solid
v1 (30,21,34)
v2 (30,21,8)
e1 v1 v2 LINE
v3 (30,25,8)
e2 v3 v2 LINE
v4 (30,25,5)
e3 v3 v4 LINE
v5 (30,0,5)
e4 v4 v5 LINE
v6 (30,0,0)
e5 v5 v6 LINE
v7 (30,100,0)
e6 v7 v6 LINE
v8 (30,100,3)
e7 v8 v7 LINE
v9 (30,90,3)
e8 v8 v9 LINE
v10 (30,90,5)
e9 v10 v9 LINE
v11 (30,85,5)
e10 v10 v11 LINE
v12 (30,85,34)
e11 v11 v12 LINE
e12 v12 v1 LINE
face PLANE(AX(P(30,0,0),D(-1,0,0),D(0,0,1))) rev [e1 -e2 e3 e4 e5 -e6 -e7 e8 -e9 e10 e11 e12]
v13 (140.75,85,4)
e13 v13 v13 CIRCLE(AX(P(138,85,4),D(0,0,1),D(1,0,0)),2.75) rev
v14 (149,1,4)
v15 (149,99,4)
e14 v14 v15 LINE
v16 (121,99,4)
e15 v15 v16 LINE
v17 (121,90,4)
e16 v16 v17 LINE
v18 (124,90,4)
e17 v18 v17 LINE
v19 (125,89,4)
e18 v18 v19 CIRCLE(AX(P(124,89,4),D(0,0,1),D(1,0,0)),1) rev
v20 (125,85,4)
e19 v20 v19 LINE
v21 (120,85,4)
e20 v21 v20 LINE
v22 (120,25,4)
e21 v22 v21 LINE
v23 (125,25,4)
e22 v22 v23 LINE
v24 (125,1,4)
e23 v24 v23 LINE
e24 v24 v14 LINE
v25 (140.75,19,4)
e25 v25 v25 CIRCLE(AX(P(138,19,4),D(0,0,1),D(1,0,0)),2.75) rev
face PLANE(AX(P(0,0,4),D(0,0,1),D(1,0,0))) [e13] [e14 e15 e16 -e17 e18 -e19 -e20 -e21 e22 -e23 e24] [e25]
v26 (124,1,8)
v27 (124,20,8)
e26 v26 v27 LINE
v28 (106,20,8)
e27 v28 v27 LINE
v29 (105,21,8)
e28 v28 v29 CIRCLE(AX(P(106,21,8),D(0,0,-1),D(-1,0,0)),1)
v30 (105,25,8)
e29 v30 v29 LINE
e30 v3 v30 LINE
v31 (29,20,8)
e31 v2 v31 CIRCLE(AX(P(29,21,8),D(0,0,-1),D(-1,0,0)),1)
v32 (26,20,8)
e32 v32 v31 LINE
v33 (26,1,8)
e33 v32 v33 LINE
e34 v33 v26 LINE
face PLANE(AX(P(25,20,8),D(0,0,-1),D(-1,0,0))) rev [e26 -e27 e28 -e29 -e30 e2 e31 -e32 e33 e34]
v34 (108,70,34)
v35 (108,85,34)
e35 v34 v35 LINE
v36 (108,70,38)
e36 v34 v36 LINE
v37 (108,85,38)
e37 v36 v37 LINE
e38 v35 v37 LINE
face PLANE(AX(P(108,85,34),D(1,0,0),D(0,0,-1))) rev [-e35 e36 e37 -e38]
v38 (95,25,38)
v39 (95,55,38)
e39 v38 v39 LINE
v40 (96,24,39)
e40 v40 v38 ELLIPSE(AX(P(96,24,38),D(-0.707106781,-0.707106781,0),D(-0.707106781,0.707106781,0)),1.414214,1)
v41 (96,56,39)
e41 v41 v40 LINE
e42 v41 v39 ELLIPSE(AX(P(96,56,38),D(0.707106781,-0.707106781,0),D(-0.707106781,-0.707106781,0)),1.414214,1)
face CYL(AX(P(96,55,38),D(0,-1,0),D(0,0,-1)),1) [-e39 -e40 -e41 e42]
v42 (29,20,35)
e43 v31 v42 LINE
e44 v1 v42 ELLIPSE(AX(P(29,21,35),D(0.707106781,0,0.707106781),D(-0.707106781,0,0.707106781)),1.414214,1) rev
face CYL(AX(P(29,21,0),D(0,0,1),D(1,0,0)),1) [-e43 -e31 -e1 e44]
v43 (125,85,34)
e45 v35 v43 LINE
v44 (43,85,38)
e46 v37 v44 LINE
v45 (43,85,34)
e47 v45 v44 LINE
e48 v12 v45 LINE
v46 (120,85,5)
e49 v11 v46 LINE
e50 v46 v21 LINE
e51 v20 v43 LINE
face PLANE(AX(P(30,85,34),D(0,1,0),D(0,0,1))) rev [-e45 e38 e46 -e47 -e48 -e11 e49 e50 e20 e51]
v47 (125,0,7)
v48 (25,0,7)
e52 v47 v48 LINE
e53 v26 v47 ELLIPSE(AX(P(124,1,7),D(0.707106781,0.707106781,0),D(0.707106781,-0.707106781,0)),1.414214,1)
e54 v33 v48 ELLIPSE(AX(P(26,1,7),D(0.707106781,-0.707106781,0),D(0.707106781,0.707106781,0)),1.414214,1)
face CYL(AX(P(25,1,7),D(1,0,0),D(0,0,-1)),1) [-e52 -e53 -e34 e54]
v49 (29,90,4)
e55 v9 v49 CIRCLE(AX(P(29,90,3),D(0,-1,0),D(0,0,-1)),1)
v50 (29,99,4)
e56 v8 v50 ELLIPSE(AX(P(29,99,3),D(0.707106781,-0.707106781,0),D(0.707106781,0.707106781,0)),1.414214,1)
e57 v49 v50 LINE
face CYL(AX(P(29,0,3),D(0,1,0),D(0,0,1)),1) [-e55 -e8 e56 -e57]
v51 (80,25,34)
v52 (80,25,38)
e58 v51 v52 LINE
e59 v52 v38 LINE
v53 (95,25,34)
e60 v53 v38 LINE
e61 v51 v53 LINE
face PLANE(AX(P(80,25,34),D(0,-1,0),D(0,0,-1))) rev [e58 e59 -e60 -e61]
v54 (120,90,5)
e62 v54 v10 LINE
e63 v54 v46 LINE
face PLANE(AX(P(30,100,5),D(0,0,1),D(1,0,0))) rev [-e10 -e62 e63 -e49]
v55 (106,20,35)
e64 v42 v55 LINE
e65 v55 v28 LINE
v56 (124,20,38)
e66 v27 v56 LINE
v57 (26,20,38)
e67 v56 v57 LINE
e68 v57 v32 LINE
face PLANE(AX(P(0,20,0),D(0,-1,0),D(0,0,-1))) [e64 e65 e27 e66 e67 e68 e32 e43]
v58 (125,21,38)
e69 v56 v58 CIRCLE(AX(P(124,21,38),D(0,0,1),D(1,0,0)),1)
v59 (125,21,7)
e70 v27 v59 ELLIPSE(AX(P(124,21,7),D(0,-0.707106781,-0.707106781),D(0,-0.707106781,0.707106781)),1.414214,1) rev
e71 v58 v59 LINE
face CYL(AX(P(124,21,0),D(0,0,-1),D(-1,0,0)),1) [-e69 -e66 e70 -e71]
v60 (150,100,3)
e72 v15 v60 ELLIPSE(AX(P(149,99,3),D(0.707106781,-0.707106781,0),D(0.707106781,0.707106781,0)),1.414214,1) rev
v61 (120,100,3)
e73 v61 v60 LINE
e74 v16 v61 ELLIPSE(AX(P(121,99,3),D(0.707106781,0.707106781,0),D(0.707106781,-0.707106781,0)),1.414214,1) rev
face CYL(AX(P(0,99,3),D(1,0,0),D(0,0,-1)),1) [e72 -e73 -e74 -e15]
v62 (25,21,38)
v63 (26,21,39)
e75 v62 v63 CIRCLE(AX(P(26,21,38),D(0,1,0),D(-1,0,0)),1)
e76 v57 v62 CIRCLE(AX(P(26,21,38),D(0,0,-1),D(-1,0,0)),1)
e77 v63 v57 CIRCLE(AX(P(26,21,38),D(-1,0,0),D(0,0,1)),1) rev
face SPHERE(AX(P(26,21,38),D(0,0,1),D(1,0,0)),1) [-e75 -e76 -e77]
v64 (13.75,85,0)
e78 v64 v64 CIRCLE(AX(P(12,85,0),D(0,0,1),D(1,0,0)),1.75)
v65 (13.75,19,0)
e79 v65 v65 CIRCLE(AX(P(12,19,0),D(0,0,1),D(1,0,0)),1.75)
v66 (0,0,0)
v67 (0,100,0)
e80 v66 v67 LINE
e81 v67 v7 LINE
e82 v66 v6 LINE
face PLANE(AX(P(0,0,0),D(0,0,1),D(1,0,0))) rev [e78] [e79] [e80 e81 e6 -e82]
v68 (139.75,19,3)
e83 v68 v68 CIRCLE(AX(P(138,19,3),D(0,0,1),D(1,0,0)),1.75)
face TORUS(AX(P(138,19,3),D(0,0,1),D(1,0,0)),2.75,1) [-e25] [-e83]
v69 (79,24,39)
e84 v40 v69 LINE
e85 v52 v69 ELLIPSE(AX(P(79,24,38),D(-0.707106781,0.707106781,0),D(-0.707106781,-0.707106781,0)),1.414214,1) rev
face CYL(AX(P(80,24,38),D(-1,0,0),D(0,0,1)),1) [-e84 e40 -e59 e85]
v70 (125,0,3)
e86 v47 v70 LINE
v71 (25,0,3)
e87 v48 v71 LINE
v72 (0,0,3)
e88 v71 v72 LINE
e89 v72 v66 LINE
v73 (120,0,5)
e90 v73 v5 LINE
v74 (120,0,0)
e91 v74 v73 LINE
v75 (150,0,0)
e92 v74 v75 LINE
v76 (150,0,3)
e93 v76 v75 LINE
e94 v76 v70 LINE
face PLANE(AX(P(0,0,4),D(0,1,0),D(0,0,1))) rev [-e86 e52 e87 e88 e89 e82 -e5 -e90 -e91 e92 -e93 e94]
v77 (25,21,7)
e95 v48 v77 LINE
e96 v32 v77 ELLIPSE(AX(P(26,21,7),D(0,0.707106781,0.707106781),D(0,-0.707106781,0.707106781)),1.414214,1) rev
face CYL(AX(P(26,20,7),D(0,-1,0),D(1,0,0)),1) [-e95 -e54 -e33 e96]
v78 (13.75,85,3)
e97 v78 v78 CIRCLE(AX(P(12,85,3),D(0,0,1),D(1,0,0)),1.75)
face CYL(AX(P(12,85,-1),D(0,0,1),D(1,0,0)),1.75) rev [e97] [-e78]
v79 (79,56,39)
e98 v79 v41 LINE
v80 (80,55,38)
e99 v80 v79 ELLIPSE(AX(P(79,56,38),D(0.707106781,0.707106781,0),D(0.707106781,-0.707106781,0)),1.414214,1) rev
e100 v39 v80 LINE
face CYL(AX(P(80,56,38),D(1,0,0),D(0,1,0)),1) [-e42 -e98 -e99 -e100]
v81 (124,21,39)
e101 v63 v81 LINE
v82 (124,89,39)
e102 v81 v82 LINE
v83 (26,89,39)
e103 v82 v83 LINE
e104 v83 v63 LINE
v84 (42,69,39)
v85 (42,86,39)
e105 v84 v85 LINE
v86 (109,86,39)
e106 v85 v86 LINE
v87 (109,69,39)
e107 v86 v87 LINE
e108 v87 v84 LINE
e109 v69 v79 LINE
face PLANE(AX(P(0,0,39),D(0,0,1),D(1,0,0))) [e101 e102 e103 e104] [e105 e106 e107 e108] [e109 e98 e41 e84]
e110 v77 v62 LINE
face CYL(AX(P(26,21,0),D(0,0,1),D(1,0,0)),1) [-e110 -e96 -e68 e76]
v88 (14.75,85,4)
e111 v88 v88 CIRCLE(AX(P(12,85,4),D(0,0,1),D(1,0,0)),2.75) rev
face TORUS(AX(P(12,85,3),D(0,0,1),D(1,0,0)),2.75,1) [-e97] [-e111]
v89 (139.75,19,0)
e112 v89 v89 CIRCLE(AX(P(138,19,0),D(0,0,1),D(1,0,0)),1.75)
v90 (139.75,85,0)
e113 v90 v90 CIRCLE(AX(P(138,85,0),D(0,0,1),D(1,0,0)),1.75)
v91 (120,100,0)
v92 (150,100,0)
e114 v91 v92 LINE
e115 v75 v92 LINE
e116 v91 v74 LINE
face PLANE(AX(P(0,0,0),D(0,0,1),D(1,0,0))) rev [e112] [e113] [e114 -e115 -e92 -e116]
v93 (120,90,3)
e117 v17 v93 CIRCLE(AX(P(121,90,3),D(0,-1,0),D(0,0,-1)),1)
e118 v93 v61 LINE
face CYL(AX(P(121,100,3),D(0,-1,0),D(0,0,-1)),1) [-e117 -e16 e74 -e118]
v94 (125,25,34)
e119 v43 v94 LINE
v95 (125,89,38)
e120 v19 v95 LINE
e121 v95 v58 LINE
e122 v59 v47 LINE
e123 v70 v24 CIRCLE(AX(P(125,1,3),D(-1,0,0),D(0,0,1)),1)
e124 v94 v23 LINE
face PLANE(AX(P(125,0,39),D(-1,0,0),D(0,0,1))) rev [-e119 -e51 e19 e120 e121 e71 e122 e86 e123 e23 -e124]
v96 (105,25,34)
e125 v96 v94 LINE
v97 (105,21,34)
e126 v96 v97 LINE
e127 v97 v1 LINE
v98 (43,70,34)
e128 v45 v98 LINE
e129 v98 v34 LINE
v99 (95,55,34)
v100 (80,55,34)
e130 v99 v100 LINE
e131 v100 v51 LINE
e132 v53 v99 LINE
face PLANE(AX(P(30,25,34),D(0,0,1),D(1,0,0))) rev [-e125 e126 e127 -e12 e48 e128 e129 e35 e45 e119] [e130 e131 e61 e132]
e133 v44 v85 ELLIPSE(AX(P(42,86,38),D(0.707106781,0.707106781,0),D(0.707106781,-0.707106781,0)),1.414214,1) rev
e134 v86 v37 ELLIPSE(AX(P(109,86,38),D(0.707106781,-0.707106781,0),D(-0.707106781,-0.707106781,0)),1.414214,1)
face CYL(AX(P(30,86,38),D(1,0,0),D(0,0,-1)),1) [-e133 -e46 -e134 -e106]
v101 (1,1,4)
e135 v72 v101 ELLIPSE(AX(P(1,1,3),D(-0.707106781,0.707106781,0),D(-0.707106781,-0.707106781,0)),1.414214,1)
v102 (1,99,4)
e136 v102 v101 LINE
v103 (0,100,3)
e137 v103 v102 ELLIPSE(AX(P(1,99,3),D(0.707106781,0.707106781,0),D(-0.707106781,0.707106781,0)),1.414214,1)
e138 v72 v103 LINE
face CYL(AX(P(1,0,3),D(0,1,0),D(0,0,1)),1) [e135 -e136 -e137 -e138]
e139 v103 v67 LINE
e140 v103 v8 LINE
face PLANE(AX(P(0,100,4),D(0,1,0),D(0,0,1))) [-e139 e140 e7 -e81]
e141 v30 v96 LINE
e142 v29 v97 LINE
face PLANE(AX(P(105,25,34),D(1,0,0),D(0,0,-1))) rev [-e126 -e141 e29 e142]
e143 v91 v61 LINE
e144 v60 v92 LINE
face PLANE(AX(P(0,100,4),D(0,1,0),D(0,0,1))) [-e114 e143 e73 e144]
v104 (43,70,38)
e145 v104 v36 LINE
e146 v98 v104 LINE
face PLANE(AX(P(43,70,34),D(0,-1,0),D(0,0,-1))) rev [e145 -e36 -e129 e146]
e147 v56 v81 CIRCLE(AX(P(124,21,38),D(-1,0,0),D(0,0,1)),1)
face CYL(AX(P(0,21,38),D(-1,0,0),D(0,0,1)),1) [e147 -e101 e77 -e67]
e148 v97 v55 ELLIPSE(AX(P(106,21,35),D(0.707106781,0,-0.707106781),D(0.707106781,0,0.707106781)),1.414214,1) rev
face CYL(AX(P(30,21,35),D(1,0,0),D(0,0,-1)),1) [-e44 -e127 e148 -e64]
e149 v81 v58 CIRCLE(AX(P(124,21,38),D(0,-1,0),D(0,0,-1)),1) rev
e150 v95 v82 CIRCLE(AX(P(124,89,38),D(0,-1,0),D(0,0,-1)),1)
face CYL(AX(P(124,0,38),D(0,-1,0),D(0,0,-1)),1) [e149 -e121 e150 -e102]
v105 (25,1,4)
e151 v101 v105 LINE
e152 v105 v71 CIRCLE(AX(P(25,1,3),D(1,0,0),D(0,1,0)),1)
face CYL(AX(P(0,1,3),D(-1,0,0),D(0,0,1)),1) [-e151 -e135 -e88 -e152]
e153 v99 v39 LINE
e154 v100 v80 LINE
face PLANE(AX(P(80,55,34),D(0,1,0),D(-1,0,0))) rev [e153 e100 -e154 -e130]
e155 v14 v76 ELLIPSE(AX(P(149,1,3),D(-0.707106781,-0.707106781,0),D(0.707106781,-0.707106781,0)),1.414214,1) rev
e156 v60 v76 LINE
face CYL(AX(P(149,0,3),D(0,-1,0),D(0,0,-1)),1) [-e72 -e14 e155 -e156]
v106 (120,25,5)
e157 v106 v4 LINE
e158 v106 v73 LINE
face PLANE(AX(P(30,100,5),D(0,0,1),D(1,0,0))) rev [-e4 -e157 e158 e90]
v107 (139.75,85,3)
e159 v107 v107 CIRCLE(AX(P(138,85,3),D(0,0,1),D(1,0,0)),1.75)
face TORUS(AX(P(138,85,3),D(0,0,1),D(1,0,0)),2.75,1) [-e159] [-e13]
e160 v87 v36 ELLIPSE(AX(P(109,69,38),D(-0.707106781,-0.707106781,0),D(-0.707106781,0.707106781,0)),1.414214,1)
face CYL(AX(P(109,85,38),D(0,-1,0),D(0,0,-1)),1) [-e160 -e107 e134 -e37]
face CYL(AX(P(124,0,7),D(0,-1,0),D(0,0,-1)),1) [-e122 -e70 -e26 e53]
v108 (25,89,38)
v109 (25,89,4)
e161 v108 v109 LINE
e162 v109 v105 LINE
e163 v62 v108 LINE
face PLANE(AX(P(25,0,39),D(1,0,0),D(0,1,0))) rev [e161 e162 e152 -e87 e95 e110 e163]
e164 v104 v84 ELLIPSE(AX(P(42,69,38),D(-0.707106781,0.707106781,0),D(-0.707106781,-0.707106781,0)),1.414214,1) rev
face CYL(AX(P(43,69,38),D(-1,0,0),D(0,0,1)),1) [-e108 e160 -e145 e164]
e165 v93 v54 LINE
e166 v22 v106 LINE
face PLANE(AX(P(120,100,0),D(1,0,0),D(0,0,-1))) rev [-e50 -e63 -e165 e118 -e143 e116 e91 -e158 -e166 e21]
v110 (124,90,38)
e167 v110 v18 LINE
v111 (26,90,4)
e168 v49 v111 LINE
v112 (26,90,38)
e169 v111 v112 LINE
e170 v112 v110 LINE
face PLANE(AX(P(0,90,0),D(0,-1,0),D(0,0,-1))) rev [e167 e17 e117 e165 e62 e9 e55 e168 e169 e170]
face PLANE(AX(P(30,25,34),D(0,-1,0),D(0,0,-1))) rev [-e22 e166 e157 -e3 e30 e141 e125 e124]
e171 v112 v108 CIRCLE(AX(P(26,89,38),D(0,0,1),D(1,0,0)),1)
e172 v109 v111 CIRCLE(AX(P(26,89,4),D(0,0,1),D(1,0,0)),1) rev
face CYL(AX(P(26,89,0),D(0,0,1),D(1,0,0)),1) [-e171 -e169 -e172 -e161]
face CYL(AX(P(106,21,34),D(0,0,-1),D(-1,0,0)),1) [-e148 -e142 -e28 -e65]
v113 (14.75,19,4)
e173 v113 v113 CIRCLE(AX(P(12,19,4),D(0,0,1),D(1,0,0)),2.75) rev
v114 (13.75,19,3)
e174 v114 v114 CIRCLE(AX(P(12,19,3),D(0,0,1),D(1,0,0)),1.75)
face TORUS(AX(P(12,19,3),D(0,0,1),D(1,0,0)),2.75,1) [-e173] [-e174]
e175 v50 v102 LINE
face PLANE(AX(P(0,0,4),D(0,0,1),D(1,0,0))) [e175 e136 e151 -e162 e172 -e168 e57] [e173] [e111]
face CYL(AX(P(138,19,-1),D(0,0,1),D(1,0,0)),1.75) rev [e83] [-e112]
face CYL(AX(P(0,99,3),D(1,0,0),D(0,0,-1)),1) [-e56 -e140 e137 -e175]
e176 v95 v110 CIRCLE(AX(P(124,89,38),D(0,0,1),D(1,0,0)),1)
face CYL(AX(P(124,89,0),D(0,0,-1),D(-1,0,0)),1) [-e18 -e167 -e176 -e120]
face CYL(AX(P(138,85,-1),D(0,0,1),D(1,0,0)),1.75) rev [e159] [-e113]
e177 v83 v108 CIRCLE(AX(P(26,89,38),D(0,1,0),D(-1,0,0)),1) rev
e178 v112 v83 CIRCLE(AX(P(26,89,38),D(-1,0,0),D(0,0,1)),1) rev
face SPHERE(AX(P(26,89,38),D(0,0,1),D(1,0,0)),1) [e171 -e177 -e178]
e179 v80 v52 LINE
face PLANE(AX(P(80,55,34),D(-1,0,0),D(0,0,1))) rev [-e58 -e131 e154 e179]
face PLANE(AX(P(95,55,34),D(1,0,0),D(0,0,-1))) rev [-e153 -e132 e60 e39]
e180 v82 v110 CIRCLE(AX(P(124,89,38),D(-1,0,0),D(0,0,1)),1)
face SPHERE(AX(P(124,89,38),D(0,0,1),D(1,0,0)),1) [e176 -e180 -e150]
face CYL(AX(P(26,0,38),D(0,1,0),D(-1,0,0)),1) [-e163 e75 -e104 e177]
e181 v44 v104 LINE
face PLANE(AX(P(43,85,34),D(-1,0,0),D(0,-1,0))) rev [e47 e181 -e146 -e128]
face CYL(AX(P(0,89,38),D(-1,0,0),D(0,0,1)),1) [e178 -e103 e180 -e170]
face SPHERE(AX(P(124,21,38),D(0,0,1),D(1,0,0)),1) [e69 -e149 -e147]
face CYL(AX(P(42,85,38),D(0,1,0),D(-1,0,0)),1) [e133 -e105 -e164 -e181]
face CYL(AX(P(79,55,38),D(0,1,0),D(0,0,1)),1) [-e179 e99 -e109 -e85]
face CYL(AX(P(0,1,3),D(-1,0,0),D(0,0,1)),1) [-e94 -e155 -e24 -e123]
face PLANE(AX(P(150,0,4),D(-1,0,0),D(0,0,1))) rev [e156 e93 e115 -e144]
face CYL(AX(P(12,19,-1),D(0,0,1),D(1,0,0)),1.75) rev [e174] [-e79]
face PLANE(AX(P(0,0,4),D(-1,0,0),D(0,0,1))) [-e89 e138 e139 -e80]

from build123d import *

# Parameters (mm, degrees)
SKETCH1_W           = 150
SKETCH1_H           = 100
BOSS_EXTRUDE1_DEPTH = 4
SKETCH2_W           = 100
SKETCH2_H           = 100
BOSS_EXTRUDE2_DEPTH = 35
SKETCH3_W           = 100
SKETCH3_H           = 31
CUT_EXTRUDE1_DEPTH  = 20
SKETCH4_W           = 100
SKETCH4_H           = 35
CUT_EXTRUDE2_DEPTH  = 10
SKETCH5_W           = 30
SKETCH5_H           = 60
CUT_EXTRUDE3_DEPTH  = 95
SKETCH6_W           = 90
SKETCH6_H           = 5
CUT_EXTRUDE4_DEPTH  = 185.447824601
SKETCH7_W           = 75
SKETCH7_H           = 26
CUT_EXTRUDE5_DEPTH  = 5
SKETCH8_W           = 65
SKETCH8_H           = 15
CUT_EXTRUDE6_DEPTH  = 5
SKETCH9_W           = 15
SKETCH9_H           = 30
CUT_EXTRUDE7_DEPTH  = 5
SKETCH10_R          = 1.75
CUT_EXTRUDE8_DEPTH  = 5
FILLET1_R           = 1
FILLET2_R           = 1
FILLET3_R           = 1
FILLET4_R           = 1
FILLET5_R           = 1


with BuildPart() as part:
    # Sketch1 → Boss-Extrude1 (new body)
    with BuildSketch(Plane.XY):
        with Locations((75, 50)):
            Rectangle(SKETCH1_W, SKETCH1_H)
    extrude(amount=BOSS_EXTRUDE1_DEPTH)

    # Sketch2 → Boss-Extrude2 (add)
    with BuildSketch(Plane.XY.offset(4)):
        with Locations((75, 50)):
            Rectangle(SKETCH2_W, SKETCH2_H)
    extrude(amount=BOSS_EXTRUDE2_DEPTH)

    # Sketch3 → Cut-Extrude1 (cut)
    with BuildSketch(Plane(origin=(0, 0, 0), x_dir=(-1, 0, 0), z_dir=(0, -1, 0))):
        with Locations((-75, -23.5)):
            Rectangle(SKETCH3_W, SKETCH3_H)
    extrude(amount=-CUT_EXTRUDE1_DEPTH, mode=Mode.SUBTRACT)

    # Sketch4 → Cut-Extrude2 (cut)
    with BuildSketch(Plane(origin=(0, 100, 0), x_dir=(1, 0, 0), z_dir=(0, 1, 0))):
        with Locations((75, -21.5)):
            Rectangle(SKETCH4_W, SKETCH4_H)
    extrude(amount=-CUT_EXTRUDE2_DEPTH, mode=Mode.SUBTRACT)

    # Sketch5 → Cut-Extrude3 (cut)
    with BuildSketch(Plane(origin=(125, 0, 0), x_dir=(0, 0, -1), z_dir=(1, 0, 0))):
        with Locations((-19, 55)):
            Rectangle(SKETCH5_W, SKETCH5_H)
    extrude(amount=-CUT_EXTRUDE3_DEPTH, mode=Mode.SUBTRACT)

    # Sketch6 → Cut-Extrude4 (cut, through all)
    with BuildSketch(Plane(origin=(0, 0, 0), x_dir=(-1, 0, 0), z_dir=(0, -1, 0))):
        with Locations((-75, -2.5)):
            Rectangle(SKETCH6_W, SKETCH6_H)
    extrude(amount=-CUT_EXTRUDE4_DEPTH, mode=Mode.SUBTRACT)

    # Sketch7 → Cut-Extrude5 (cut)
    with BuildSketch(Plane(origin=(0, 20, 0), x_dir=(-1, 0, 0), z_dir=(0, -1, 0))):
        with Locations((-67.5, -21)):
            Rectangle(SKETCH7_W, SKETCH7_H)
    extrude(amount=-CUT_EXTRUDE5_DEPTH, mode=Mode.SUBTRACT)

    # Sketch8 → Cut-Extrude6 (cut)
    with BuildSketch(Plane.XY.offset(39)):
        with Locations((75.5, 77.5)):
            Rectangle(SKETCH8_W, SKETCH8_H)
    extrude(amount=-CUT_EXTRUDE6_DEPTH, mode=Mode.SUBTRACT)

    # Sketch9 → Cut-Extrude7 (cut)
    with BuildSketch(Plane.XY.offset(39)):
        with Locations((87.5, 40)):
            Rectangle(SKETCH9_W, SKETCH9_H)
    extrude(amount=-CUT_EXTRUDE7_DEPTH, mode=Mode.SUBTRACT)

    # Sketch10 → Cut-Extrude8 (cut)
    with BuildSketch(Plane.XY.offset(4)):
        with Locations((12, 85)):
            Circle(SKETCH10_R)
        with Locations((12, 19)):
            Circle(SKETCH10_R)
        with Locations((138, 85)):
            Circle(SKETCH10_R)
        with Locations((138, 19)):
            Circle(SKETCH10_R)
    extrude(amount=-CUT_EXTRUDE8_DEPTH, mode=Mode.SUBTRACT)

    # Fillet1
    fillet1_edges = [part.edges().sort_by_distance(p)[0] for p in [
        (10.25, 19, 4),
        (136.25, 85, 4),
        (136.25, 19, 4),
        (10.25, 85, 4),
    ]]
    fillet(fillet1_edges, radius=FILLET1_R)

    # Fillet2
    fillet2_edges = [part.edges().sort_by_distance(p)[0] for p in [
        (43, 77.5, 39),
        (75.5, 70, 39),
        (108, 77.5, 39),
        (75.5, 85, 39),
        (80, 40, 39),
        (87.5, 25, 39),
        (95, 40, 39),
        (87.5, 55, 39),
        (125, 55, 39),
        (75, 20, 39),
        (25, 55, 39),
        (75, 90, 39),
    ]]
    fillet(fillet2_edges, radius=FILLET2_R)

    # Fillet3
    # the kernel refuses this fillet: 1 mm, written as the material it takes off along each edge
    with BuildSketch(Plane(origin=(26, 21, 38), x_dir=(0, -1, 0), z_dir=(-1, 0, 0))) as fillet3_piece_1_section:
        Polygon((0, 0), (FILLET3_R, 0), (FILLET3_R, FILLET3_R), (0, FILLET3_R), align=None)
    fillet3_piece_1 = extrude(amount=FILLET3_R, mode=Mode.PRIVATE)
    fillet3_piece_1 = fillet3_piece_1 - Plane(origin=(26, 21, 38), x_dir=(0, 0.7071067811865475, -0.7071067811865475), z_dir=(-1, 0, 0)) * Sphere(FILLET3_R, mode=Mode.PRIVATE)
    add(fillet3_piece_1, mode=Mode.SUBTRACT)
    with BuildSketch(Plane(origin=(26, 89, 38), x_dir=(-1, 0, 0), z_dir=(0, 1, 0))) as fillet3_piece_2_section:
        Polygon((0, 0), (FILLET3_R, 0), (FILLET3_R, FILLET3_R), (0, FILLET3_R), align=None)
    fillet3_piece_2 = extrude(amount=FILLET3_R, mode=Mode.PRIVATE)
    fillet3_piece_2 = fillet3_piece_2 - Plane(origin=(26, 89, 38), x_dir=(0.7071067811865475, 0, -0.7071067811865475), z_dir=(0, 1, 0)) * Sphere(FILLET3_R, mode=Mode.PRIVATE)
    add(fillet3_piece_2, mode=Mode.SUBTRACT)
    with BuildSketch(Plane(origin=(124, 21, 38), x_dir=(0, -1, 0), z_dir=(1, 0, 0))) as fillet3_piece_3_section:
        Polygon((0, 0), (FILLET3_R, 0), (FILLET3_R, -FILLET3_R), (0, -FILLET3_R), align=None)
    fillet3_piece_3 = extrude(amount=FILLET3_R, mode=Mode.PRIVATE)
    fillet3_piece_3 = fillet3_piece_3 - Plane(origin=(124, 21, 38), x_dir=(0, 0.7071067811865475, -0.7071067811865475), z_dir=(1, 0, 0)) * Sphere(FILLET3_R, mode=Mode.PRIVATE)
    add(fillet3_piece_3, mode=Mode.SUBTRACT)
    with BuildSketch(Plane(origin=(124, 89, 38), x_dir=(1, 0, 0), z_dir=(0, 1, 0))) as fillet3_piece_4_section:
        Polygon((0, 0), (FILLET3_R, 0), (FILLET3_R, -FILLET3_R), (0, -FILLET3_R), align=None)
    fillet3_piece_4 = extrude(amount=FILLET3_R, mode=Mode.PRIVATE)
    fillet3_piece_4 = fillet3_piece_4 - Plane(origin=(124, 89, 38), x_dir=(-0.7071067811865475, 0, -0.7071067811865475), z_dir=(0, 1, 0)) * Sphere(FILLET3_R, mode=Mode.PRIVATE)
    add(fillet3_piece_4, mode=Mode.SUBTRACT)
    with BuildSketch(Plane(origin=(125, 90, 38), x_dir=(-1, 0, 0), z_dir=(0, 0, -1)), Plane(origin=(25, 90, 4), x_dir=(1, 0, 0), z_dir=(0, 0, 1))) as fillet3_piece_5:
        with BuildLine():
            CenterArc((FILLET3_R, -FILLET3_R), FILLET3_R, 90, 90)
            Line((0, -FILLET3_R), (0, 0))
            Line((0, 0), (FILLET3_R, 0))
        make_face()
    extrude(amount=34, mode=Mode.SUBTRACT)
    with BuildSketch(Plane(origin=(25, 20, 8), x_dir=(0, 1, 0), z_dir=(0, 0, 1)), Plane(origin=(125, 20, 38), x_dir=(0, 1, 0), z_dir=(0, 0, -1))) as fillet3_piece_6:
        with BuildLine():
            CenterArc((FILLET3_R, -FILLET3_R), FILLET3_R, 90, 90)
            Line((0, -FILLET3_R), (0, 0))
            Line((0, 0), (FILLET3_R, 0))
        make_face()
    extrude(amount=30, mode=Mode.SUBTRACT)
    with BuildSketch(Plane(origin=(25, -2.5, 8), x_dir=(0, 0, -1), z_dir=(0, 1, 0))) as fillet3_piece_7:
        with BuildLine():
            CenterArc((FILLET3_R, -FILLET3_R), FILLET3_R, 90, 90)
            Line((0, -FILLET3_R), (0, 0))
            Line((0, 0), (FILLET3_R, 0))
        make_face()
    extrude(amount=22.5, mode=Mode.SUBTRACT)
    with BuildSketch(Plane(origin=(125, -2.5, 8), x_dir=(0, 0, -1), z_dir=(0, 1, 0))) as fillet3_piece_8:
        with BuildLine():
            CenterArc((FILLET3_R, FILLET3_R), FILLET3_R, 180, 90)
            Line((0, FILLET3_R), (0, 0))
            Line((0, 0), (FILLET3_R, 0))
        make_face()
    extrude(amount=22.5, mode=Mode.SUBTRACT)
    with BuildSketch(Plane(origin=(127.5, 0, 8), x_dir=(0, 1, 0), z_dir=(-1, 0, 0))) as fillet3_piece_9:
        with BuildLine():
            CenterArc((FILLET3_R, FILLET3_R), FILLET3_R, 180, 90)
            Line((0, FILLET3_R), (0, 0))
            Line((0, 0), (FILLET3_R, 0))
        make_face()
    extrude(amount=105, mode=Mode.SUBTRACT)
    with BuildSketch(Plane(origin=(25, 20, 5.5), x_dir=(0, 1, 0), z_dir=(0, 0, 1))) as fillet3_piece_10a_section:
        with BuildLine():
            CenterArc((FILLET3_R, -FILLET3_R), FILLET3_R, 90, 90)
            Line((0, -FILLET3_R), (0, 0))
            Line((0, 0), (FILLET3_R, 0))
        make_face()
    fillet3_piece_10a = extrude(amount=32.5, mode=Mode.PRIVATE)
    fillet3_piece_10a = split(fillet3_piece_10a, bisect_by=Plane(origin=(25.226395114, 20.226395114, 8), z_dir=(0, 0, -1)), keep=Keep.TOP, mode=Mode.PRIVATE)
    with BuildSketch(Plane(origin=(25, -2.5, 8), x_dir=(0, 0, -1), z_dir=(0, 1, 0))) as fillet3_piece_10b_section:
        with BuildLine():
            CenterArc((FILLET3_R, -FILLET3_R), FILLET3_R, 90, 90)
            Line((0, -FILLET3_R), (0, 0))
            Line((0, 0), (FILLET3_R, 0))
        make_face()
    fillet3_piece_10b = extrude(amount=25, mode=Mode.PRIVATE)
    fillet3_piece_10b = split(fillet3_piece_10b, bisect_by=Plane(origin=(25.226395114, 20, 7.773604886), z_dir=(0, 1, 0)), keep=Keep.TOP, mode=Mode.PRIVATE)
    fillet3_piece_10 = fillet3_piece_10a & fillet3_piece_10b
    add(fillet3_piece_10, mode=Mode.SUBTRACT)
    with BuildSketch(Plane(origin=(125, 20, 38), x_dir=(0, 1, 0), z_dir=(0, 0, -1))) as fillet3_piece_11a_section:
        with BuildLine():
            CenterArc((FILLET3_R, -FILLET3_R), FILLET3_R, 90, 90)
            Line((0, -FILLET3_R), (0, 0))
            Line((0, 0), (FILLET3_R, 0))
        make_face()
    fillet3_piece_11a = extrude(amount=32.5, mode=Mode.PRIVATE)
    fillet3_piece_11a = split(fillet3_piece_11a, bisect_by=Plane(origin=(124.773604886, 20.226395114, 8), z_dir=(0, 0, -1)), keep=Keep.TOP, mode=Mode.PRIVATE)
    with BuildSketch(Plane(origin=(125, -2.5, 8), x_dir=(0, 0, -1), z_dir=(0, 1, 0))) as fillet3_piece_11b_section:
        with BuildLine():
            CenterArc((FILLET3_R, FILLET3_R), FILLET3_R, 180, 90)
            Line((0, FILLET3_R), (0, 0))
            Line((0, 0), (FILLET3_R, 0))
        make_face()
    fillet3_piece_11b = extrude(amount=25, mode=Mode.PRIVATE)
    fillet3_piece_11b = split(fillet3_piece_11b, bisect_by=Plane(origin=(124.773604886, 20, 7.773604886), z_dir=(0, 1, 0)), keep=Keep.TOP, mode=Mode.PRIVATE)
    fillet3_piece_11 = fillet3_piece_11a & fillet3_piece_11b
    add(fillet3_piece_11, mode=Mode.SUBTRACT)

    # Fillet4
    fillet4_edges = [part.edges().sort_by_distance(p)[0] for p in [
        (12.5, 0, 4),
        (137.5, 0, 4),
        (0, 50, 4),
        (15, 100, 4),
        (135, 100, 4),
        (30, 95, 4),
        (120, 95, 4),
        (150, 50, 4),
    ]]
    fillet(fillet4_edges, radius=FILLET4_R)

    # Fillet5
    fillet5_edges = [part.edges().sort_by_distance(p)[0] for p in [
        (30, 20, 21),
        (105, 20, 21),
        (67.5, 20, 34),
    ]]
    fillet(fillet5_edges, radius=FILLET5_R)


solid = part.part
